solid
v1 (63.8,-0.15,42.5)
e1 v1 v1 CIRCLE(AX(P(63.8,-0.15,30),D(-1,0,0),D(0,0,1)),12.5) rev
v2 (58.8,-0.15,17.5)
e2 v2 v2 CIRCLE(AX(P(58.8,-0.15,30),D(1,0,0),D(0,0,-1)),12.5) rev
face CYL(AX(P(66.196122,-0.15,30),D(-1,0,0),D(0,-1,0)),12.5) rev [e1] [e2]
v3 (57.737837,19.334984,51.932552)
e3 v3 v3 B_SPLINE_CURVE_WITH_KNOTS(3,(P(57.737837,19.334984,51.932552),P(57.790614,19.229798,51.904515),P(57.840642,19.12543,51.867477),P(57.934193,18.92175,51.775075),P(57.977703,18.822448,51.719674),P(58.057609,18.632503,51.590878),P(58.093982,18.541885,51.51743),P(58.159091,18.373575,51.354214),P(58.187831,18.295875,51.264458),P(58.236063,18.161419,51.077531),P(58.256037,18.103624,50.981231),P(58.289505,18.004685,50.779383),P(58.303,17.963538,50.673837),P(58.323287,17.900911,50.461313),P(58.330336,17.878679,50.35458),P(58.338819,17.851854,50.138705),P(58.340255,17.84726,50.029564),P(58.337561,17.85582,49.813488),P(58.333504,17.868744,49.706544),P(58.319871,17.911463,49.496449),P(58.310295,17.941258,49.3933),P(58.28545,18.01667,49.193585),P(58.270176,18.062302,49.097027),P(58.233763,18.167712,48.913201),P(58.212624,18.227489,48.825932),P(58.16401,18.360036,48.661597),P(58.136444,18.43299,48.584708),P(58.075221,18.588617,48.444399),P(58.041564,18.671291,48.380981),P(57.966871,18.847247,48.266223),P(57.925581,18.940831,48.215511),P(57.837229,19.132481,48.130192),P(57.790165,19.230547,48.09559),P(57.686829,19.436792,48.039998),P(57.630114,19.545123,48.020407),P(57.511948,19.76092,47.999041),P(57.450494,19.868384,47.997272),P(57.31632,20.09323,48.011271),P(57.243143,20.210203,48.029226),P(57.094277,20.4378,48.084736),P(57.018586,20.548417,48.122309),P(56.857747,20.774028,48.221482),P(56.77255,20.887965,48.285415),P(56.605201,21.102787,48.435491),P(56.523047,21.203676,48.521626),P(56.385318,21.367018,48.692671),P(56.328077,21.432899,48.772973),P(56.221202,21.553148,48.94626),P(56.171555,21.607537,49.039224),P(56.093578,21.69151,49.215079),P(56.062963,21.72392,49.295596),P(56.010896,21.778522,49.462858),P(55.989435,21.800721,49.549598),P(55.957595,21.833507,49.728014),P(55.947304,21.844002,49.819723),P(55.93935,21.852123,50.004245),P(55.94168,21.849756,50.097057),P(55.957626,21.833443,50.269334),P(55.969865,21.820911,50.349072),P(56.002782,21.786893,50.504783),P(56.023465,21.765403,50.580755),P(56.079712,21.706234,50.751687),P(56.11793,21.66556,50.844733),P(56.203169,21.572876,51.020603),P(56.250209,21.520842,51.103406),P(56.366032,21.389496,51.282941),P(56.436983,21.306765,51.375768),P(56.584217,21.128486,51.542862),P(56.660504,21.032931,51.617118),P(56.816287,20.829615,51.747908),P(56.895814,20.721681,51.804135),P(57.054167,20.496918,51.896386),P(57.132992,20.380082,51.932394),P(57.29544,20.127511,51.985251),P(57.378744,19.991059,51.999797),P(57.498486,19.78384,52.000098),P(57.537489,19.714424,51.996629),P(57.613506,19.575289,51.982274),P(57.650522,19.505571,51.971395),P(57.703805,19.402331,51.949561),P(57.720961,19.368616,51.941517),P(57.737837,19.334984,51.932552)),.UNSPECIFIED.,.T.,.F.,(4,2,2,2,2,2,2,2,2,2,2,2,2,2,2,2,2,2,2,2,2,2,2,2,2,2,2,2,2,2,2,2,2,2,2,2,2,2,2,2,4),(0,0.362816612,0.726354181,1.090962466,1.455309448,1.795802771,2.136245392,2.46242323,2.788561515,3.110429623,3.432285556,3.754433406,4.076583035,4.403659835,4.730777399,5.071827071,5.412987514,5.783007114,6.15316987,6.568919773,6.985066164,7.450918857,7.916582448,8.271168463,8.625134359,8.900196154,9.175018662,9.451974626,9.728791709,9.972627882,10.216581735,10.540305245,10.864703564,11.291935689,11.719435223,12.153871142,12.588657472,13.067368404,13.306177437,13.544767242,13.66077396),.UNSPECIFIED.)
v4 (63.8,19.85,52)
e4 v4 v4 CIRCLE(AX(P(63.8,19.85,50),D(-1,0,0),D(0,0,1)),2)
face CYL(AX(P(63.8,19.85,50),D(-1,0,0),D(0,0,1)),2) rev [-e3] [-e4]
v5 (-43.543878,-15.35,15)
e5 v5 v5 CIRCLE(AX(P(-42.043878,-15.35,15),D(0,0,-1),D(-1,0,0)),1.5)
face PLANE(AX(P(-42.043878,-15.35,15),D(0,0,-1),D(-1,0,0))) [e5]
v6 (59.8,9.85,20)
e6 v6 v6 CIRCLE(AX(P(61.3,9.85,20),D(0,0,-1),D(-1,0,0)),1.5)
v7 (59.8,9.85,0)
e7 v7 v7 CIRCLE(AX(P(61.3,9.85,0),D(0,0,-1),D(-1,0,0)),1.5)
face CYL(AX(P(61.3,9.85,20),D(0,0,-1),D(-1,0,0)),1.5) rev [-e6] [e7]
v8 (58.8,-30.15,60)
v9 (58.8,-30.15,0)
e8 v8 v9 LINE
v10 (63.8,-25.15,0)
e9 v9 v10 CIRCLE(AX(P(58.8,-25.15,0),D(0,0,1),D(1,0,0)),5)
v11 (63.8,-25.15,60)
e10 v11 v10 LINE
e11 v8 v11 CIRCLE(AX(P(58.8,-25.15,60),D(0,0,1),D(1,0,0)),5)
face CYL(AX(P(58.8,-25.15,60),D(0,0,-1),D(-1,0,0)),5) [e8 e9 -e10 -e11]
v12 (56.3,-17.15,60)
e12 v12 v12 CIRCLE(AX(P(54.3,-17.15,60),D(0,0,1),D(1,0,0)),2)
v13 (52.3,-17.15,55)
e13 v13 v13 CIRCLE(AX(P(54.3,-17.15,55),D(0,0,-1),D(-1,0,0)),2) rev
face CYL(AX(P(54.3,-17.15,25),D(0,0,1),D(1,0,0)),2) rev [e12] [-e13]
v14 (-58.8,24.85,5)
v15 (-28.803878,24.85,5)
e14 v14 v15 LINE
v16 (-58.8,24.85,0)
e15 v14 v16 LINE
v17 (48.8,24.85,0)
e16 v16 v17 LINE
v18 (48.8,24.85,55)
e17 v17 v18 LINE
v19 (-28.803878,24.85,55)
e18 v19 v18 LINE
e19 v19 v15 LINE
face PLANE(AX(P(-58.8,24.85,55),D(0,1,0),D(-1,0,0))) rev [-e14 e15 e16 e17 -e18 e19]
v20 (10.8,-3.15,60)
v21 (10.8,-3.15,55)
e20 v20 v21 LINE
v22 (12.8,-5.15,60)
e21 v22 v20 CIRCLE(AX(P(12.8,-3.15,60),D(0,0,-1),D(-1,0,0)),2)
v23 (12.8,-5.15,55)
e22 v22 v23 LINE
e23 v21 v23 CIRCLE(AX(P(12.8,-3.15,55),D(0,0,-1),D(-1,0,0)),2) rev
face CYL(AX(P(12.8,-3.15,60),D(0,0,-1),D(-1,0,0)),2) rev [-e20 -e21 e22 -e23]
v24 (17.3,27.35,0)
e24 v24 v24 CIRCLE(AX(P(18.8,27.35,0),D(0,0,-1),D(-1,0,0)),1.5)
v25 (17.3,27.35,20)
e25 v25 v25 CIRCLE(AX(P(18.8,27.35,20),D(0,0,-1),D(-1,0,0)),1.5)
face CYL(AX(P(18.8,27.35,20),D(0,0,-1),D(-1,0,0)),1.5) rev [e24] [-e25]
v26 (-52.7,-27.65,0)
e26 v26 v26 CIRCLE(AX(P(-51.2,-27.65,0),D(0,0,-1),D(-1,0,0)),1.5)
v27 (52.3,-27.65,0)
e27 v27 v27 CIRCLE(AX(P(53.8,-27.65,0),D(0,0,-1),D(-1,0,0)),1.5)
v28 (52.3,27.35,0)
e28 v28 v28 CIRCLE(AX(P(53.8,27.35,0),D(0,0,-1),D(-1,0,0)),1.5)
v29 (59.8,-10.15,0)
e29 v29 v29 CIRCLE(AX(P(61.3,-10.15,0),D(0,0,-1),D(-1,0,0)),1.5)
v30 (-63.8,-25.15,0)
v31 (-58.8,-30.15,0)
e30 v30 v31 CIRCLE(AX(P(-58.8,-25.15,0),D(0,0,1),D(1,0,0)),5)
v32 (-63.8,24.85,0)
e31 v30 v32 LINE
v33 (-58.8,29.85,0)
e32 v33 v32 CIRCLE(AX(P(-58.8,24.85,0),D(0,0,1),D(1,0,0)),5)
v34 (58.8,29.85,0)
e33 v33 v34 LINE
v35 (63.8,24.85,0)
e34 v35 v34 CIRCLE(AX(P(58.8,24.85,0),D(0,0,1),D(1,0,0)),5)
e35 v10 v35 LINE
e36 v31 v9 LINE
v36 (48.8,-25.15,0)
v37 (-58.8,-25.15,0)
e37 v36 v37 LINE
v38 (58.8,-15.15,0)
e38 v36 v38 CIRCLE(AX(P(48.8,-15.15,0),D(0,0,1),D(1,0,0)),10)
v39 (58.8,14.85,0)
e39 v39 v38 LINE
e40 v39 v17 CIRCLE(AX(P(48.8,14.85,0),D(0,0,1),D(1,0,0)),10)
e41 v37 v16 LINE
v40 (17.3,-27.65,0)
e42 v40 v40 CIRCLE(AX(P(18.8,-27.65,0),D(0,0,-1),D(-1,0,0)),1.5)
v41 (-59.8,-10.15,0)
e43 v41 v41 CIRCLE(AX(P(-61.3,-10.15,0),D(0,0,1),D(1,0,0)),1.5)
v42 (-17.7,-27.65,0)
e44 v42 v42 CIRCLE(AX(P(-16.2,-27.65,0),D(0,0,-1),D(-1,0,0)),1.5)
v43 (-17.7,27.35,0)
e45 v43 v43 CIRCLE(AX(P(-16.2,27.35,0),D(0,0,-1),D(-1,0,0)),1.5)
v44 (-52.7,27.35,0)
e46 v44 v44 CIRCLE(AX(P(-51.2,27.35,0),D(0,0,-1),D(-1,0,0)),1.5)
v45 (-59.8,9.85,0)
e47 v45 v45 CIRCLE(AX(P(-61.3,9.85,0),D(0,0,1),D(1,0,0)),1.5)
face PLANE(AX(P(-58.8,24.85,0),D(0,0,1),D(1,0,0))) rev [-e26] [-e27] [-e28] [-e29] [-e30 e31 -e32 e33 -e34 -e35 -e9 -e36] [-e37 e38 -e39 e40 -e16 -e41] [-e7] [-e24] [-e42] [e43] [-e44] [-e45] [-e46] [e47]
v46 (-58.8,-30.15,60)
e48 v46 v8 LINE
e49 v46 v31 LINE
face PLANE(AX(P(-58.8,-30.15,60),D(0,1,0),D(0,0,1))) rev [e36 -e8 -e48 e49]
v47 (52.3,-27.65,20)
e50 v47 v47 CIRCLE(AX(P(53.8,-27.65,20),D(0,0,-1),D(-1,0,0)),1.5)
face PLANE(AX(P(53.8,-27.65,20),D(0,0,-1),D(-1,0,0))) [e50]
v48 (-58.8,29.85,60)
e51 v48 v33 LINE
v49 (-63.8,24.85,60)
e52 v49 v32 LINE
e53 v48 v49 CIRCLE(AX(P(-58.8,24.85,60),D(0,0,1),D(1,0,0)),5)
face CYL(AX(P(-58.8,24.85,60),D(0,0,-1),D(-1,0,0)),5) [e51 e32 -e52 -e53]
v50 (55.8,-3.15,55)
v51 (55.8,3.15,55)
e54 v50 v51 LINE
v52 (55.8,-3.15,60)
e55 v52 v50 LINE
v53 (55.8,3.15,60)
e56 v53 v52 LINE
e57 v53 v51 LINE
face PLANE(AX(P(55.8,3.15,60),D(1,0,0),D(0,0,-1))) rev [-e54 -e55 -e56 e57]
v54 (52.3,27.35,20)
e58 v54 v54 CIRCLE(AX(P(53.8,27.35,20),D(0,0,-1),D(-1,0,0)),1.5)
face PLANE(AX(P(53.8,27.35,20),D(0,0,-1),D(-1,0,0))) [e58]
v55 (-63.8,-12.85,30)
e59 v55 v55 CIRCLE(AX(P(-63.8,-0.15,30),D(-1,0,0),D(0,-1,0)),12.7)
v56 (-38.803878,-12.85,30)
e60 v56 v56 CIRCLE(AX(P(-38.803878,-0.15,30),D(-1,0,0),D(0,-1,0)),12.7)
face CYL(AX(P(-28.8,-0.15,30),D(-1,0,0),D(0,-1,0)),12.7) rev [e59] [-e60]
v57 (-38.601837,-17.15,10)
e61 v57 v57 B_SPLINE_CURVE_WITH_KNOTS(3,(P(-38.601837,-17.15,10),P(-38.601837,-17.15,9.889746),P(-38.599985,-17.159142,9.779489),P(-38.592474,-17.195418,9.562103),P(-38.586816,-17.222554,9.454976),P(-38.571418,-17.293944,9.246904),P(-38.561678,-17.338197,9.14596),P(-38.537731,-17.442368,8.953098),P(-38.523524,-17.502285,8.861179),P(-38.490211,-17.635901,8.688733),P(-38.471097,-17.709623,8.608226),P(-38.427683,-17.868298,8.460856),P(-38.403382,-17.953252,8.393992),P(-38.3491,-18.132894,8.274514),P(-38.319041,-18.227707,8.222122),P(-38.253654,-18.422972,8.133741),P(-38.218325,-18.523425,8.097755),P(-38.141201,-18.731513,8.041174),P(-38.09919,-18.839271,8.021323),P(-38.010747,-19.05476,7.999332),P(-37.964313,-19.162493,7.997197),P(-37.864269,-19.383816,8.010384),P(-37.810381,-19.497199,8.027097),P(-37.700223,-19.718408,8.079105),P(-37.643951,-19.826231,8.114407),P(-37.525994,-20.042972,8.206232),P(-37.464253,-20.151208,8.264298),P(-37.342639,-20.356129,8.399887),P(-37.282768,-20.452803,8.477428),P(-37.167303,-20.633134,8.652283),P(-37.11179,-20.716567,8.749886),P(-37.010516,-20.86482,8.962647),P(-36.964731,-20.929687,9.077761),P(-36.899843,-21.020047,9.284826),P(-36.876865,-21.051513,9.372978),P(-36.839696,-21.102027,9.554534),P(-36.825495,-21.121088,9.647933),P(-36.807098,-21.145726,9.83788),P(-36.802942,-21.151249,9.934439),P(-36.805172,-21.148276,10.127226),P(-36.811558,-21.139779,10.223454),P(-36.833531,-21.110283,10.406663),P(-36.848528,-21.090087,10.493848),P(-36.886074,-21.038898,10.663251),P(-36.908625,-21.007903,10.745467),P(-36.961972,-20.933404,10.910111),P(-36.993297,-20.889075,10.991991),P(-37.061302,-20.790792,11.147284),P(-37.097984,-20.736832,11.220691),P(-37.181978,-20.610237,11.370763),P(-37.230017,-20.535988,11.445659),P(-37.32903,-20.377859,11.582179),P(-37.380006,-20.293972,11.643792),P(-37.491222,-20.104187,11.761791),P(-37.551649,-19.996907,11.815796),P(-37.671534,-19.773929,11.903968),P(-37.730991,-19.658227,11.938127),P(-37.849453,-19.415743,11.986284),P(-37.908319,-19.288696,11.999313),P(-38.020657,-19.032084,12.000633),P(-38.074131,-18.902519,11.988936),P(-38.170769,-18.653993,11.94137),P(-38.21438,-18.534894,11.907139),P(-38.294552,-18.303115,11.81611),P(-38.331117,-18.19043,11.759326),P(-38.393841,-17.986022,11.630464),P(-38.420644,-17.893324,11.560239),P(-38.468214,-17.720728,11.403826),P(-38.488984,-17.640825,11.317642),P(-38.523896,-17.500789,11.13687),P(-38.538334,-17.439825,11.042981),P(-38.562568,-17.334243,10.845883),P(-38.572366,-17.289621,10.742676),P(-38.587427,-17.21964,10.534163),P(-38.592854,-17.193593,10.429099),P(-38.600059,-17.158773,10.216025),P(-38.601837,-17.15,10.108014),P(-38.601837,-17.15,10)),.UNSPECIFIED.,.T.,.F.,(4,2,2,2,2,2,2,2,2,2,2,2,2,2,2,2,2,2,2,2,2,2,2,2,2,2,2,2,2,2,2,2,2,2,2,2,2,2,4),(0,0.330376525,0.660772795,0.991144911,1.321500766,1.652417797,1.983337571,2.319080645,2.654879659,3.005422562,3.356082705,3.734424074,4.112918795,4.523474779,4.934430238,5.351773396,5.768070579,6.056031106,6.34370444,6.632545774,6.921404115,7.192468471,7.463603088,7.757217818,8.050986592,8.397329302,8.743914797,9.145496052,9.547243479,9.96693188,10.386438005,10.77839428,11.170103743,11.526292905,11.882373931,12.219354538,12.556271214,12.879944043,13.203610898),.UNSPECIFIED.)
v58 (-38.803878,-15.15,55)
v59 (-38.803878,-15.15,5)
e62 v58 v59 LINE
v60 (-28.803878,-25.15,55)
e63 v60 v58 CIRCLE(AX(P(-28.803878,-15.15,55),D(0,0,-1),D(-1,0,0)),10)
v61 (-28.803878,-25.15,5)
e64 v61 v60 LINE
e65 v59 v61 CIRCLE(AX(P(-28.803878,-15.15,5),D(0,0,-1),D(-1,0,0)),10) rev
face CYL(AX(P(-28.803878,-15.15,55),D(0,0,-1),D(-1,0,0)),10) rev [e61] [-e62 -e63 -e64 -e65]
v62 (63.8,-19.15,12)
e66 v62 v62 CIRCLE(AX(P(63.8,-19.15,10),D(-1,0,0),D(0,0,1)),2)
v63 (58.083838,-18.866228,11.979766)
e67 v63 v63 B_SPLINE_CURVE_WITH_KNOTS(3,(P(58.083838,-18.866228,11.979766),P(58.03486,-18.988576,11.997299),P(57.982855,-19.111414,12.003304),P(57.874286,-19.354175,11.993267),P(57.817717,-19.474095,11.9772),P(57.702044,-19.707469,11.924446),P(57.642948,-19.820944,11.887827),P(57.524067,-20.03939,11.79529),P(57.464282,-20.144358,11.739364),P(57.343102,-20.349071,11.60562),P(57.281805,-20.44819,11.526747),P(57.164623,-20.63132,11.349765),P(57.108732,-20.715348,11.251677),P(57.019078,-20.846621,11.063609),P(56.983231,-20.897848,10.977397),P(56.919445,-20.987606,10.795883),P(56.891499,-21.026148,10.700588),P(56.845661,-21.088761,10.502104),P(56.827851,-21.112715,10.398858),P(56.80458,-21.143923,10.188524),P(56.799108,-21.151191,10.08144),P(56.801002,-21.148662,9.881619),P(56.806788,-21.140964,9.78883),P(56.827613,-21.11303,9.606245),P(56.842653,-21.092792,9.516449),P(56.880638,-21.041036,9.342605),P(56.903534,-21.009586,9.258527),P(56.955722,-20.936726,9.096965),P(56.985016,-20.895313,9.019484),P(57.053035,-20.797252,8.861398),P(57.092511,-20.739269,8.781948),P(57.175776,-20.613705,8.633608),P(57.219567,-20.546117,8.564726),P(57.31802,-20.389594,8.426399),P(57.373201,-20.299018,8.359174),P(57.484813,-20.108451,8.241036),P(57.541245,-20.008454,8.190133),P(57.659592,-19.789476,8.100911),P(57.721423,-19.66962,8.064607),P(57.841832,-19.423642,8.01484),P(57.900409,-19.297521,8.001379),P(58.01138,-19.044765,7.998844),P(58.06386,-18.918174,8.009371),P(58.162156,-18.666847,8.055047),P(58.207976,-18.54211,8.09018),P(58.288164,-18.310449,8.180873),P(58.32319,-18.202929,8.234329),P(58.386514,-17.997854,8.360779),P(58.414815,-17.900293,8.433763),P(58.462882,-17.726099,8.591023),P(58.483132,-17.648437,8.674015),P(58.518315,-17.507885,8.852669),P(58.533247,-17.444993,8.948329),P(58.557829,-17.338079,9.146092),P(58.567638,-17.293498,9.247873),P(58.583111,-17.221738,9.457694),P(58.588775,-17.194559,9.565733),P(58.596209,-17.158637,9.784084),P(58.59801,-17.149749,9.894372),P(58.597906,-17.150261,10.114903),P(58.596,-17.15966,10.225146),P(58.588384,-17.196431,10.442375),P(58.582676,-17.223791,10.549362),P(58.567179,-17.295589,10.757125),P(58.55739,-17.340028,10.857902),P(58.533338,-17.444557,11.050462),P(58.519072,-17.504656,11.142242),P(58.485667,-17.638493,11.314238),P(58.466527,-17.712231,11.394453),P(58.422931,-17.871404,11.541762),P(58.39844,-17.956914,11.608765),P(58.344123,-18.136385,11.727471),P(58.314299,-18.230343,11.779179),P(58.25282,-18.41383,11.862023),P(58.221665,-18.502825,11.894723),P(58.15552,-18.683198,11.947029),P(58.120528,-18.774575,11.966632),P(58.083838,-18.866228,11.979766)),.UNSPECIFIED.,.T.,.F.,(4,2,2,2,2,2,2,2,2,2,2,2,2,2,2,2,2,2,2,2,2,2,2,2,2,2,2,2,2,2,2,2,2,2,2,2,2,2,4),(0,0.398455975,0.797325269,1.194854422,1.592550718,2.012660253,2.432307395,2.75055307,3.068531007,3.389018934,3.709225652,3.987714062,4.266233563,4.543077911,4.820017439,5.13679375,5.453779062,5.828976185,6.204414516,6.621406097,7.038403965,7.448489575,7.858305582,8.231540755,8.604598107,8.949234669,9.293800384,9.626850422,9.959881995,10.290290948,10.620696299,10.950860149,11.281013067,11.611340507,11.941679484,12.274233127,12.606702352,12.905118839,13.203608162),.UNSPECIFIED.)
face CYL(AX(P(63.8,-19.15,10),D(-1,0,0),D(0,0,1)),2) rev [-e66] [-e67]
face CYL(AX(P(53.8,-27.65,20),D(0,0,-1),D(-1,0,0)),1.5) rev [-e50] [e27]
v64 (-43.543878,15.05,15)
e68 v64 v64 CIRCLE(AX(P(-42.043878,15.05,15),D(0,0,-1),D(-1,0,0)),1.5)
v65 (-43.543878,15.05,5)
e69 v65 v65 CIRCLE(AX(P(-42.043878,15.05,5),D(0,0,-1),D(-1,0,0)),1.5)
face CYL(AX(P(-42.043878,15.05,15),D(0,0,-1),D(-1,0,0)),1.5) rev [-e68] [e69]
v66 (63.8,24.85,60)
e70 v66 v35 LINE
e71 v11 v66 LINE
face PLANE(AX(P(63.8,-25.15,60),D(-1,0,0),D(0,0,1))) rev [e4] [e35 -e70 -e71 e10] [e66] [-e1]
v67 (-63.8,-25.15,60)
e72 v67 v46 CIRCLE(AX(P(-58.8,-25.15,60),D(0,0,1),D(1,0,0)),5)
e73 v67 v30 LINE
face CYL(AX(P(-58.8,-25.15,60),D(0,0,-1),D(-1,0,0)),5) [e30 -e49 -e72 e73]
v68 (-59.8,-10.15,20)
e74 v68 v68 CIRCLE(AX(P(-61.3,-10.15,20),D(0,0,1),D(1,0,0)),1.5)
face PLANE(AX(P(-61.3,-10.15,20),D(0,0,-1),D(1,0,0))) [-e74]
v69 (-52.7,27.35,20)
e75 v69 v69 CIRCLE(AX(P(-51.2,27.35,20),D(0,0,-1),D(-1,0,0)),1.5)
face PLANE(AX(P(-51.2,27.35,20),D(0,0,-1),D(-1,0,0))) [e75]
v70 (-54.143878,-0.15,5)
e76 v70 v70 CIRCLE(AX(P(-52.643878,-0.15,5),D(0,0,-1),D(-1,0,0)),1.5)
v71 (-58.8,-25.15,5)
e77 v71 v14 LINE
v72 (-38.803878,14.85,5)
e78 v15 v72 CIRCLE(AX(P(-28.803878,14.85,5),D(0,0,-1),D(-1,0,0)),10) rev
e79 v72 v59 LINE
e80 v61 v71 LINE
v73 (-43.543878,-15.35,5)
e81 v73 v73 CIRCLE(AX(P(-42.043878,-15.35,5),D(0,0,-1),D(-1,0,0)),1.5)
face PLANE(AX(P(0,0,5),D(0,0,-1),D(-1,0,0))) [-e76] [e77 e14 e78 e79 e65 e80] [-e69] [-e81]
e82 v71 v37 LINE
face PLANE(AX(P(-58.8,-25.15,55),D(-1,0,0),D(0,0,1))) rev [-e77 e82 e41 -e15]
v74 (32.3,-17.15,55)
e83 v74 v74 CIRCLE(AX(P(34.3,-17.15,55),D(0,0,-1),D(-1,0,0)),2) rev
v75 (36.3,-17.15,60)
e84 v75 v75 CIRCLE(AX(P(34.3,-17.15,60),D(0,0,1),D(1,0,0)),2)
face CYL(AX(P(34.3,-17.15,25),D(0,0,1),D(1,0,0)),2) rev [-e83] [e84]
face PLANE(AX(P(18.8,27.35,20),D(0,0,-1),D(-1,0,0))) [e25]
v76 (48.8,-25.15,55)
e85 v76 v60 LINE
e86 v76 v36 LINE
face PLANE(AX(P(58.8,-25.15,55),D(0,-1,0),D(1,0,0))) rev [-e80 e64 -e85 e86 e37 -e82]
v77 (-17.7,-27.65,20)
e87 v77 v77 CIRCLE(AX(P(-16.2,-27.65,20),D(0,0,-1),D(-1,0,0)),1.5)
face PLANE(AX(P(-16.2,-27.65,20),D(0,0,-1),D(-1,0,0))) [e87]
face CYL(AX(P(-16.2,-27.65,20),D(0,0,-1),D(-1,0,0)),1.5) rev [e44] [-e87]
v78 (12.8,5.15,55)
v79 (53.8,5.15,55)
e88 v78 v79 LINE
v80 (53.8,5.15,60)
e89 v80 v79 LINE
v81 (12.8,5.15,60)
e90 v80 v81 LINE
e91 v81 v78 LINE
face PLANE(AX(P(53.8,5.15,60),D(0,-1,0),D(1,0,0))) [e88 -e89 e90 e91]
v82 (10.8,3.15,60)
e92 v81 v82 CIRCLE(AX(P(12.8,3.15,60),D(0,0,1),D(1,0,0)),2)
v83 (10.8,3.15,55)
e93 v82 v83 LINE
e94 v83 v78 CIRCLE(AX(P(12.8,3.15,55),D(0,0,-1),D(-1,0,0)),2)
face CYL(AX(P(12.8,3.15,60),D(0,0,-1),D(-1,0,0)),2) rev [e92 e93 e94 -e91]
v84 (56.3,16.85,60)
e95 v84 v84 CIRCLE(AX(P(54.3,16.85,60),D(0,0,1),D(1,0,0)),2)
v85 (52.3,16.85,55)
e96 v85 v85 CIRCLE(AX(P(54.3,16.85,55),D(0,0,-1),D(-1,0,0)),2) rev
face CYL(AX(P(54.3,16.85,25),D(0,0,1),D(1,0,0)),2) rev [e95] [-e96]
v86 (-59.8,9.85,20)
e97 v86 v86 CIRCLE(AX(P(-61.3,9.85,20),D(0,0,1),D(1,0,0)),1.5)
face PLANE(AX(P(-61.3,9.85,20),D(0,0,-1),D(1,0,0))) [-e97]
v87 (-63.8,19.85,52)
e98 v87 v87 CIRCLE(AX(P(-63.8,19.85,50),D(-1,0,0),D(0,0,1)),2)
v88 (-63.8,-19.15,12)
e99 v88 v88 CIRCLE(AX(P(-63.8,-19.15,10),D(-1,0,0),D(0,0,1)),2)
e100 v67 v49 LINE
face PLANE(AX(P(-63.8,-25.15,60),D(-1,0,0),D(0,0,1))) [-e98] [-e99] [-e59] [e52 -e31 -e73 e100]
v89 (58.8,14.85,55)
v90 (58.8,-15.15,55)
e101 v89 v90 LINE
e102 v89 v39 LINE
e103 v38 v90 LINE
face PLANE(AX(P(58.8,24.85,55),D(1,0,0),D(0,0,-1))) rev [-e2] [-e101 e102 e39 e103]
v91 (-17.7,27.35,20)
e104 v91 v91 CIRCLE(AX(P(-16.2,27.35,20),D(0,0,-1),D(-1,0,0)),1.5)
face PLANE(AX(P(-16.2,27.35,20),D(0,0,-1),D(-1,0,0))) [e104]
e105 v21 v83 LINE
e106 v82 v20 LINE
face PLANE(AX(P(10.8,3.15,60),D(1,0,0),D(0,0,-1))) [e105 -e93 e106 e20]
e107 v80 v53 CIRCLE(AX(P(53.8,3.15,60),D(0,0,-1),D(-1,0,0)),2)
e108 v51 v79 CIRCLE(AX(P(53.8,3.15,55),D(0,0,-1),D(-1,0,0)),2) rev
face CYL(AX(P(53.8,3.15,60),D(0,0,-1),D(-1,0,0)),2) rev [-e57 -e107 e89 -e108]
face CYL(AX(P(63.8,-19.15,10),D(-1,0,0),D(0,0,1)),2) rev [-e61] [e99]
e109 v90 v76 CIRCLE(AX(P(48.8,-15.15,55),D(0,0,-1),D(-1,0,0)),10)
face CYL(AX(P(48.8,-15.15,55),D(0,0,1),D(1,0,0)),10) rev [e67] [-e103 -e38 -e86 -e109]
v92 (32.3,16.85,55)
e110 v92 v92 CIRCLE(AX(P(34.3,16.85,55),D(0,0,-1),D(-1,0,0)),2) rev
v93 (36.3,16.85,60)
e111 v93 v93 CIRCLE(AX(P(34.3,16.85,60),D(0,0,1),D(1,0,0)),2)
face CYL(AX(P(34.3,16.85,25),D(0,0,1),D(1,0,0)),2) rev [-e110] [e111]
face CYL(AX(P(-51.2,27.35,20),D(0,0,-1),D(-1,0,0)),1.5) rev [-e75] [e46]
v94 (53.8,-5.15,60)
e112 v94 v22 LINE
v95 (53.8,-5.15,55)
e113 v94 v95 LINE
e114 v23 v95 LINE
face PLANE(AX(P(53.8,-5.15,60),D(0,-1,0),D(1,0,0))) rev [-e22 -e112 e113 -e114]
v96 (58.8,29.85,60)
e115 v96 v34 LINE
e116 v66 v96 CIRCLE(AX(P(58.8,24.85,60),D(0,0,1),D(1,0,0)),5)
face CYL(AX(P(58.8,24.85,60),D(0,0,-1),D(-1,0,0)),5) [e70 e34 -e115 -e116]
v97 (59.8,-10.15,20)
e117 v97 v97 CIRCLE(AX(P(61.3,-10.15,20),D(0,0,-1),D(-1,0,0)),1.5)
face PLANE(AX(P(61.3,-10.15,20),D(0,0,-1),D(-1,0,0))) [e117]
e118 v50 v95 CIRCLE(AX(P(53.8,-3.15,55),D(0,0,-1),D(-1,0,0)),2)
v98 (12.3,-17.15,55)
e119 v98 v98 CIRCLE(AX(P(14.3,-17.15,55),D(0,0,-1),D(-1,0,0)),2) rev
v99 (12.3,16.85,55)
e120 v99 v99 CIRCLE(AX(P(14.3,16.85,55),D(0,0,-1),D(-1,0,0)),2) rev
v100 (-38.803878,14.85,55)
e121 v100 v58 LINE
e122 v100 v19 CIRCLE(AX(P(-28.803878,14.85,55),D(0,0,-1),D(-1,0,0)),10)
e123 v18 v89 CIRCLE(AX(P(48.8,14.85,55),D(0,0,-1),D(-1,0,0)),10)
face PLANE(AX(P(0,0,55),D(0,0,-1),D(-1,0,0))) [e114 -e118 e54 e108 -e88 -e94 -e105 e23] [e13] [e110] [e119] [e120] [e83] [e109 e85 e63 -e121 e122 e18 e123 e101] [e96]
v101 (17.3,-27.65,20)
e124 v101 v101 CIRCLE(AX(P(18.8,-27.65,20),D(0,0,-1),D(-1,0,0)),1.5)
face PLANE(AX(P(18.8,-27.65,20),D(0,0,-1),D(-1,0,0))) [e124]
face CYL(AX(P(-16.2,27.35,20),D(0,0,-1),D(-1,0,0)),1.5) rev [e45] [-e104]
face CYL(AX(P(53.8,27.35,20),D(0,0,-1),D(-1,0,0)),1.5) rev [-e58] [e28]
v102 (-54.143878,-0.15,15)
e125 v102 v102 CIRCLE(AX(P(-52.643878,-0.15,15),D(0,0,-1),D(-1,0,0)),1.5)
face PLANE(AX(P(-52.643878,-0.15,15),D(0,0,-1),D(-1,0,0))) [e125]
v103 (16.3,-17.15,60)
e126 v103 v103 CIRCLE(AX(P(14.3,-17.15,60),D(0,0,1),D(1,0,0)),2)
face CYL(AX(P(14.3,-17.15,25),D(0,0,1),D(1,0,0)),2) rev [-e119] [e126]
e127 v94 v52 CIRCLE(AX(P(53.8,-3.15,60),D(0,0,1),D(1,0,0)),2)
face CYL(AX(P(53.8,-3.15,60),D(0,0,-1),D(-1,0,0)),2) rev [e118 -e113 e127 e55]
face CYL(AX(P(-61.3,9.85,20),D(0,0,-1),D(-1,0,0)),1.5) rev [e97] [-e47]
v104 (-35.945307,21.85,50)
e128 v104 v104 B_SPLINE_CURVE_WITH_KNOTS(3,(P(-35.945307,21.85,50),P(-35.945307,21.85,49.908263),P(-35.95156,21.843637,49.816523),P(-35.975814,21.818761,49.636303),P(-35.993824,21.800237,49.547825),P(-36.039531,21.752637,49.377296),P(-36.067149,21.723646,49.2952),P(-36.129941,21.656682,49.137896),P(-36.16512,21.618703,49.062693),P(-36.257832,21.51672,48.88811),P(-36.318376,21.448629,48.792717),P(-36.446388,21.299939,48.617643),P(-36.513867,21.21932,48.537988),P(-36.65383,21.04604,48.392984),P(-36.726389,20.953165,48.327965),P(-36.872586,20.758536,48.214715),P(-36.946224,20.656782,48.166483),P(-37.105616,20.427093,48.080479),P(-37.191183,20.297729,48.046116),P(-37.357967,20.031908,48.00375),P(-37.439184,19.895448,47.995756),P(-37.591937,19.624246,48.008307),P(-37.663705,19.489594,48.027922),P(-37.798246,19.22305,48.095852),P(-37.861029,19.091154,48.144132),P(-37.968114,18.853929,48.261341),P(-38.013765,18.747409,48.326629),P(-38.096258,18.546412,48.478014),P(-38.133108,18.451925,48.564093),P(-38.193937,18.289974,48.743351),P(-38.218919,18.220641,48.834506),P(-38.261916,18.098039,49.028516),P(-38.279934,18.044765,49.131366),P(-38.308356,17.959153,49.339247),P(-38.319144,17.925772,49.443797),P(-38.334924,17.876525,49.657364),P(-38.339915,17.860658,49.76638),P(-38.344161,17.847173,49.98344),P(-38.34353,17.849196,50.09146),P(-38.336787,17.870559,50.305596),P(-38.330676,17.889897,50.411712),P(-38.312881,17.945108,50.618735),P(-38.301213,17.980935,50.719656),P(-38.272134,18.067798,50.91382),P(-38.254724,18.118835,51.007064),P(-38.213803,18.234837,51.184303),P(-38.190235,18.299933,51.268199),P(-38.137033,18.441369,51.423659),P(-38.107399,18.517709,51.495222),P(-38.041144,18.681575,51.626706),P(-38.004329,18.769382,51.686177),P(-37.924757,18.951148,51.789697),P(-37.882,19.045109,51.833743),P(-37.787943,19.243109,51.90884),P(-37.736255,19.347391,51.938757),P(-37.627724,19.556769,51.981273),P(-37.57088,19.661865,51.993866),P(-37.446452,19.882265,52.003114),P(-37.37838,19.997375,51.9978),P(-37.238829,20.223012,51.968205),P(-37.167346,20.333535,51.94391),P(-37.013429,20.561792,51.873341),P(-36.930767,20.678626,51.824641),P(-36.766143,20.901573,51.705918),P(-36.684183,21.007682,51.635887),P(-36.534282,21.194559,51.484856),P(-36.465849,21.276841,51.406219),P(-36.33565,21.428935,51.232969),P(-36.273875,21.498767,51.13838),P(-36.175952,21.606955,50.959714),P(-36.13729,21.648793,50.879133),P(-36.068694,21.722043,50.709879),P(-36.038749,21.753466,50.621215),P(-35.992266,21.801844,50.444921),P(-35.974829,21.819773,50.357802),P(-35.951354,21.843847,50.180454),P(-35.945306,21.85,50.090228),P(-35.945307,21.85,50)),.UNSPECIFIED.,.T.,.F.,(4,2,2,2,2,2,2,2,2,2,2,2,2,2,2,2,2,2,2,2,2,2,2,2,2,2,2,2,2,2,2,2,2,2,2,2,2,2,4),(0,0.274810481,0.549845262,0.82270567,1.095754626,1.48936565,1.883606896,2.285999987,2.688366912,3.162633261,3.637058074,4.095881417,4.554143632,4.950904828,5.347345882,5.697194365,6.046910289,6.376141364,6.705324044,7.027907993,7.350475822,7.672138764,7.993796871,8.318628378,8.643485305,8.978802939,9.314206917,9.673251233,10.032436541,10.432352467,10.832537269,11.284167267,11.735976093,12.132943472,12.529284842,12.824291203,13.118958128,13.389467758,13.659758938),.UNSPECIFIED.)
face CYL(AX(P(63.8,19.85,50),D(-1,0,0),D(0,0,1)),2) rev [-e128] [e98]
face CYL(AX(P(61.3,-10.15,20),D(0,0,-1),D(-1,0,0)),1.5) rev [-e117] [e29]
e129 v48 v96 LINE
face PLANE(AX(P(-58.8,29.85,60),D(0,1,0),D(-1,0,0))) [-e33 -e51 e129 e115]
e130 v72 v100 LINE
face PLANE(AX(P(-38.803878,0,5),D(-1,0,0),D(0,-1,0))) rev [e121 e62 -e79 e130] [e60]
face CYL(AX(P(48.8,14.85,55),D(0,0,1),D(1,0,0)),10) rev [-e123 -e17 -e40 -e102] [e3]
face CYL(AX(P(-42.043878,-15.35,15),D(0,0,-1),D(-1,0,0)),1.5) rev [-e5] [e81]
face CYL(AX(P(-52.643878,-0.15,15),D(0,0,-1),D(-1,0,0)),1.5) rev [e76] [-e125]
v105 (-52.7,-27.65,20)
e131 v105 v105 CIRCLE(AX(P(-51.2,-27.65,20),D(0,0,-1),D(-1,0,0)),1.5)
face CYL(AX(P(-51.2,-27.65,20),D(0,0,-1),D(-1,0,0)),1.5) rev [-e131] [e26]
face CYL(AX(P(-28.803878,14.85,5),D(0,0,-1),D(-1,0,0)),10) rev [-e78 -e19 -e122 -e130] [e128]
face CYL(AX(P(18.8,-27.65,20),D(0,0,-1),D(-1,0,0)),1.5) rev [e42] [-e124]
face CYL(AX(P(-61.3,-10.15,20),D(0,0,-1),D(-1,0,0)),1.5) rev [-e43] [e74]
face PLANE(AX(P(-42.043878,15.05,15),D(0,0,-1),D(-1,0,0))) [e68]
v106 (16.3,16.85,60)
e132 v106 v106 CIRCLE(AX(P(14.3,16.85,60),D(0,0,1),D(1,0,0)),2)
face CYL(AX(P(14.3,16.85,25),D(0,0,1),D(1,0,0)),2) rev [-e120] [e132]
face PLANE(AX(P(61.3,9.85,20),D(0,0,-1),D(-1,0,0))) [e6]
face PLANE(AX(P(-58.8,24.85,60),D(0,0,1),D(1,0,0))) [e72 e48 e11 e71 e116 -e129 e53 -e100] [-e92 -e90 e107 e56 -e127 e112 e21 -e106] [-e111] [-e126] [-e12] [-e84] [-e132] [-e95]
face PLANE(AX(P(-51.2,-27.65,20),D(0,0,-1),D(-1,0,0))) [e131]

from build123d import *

# Parameters (mm, degrees)
BOSS_EXTRUDE1_DEPTH  = 60
SKETCH3_R            = 2
CUT_EXTRUDE2_DEPTH   = 35
SKETCH2_W            = 117.6
SKETCH2_H            = 50
CUT_EXTRUDE4_DEPTH   = 55
BOSS_EXTRUDE2_DEPTH  = 50
SKETCH8_R            = 12.7
CUT_EXTRUDE5_DEPTH   = 35
SKETCH13_R           = 2
CUT_EXTRUDE6_DEPTH   = 145.190091546
SKETCH14_R           = 1.5
CUT_EXTRUDE7_DEPTH   = 10
SKETCH16_R           = 12.5
CUT_EXTRUDE8_DEPTH   = 10
SKETCH17_R           = 1.5
CUT_EXTRUDE9_DEPTH   = 20
SKETCH18_R           = 1.5
CUT_EXTRUDE10_DEPTH  = 20
LPATTERN1_COUNT      = 4
LPATTERN1_PITCH      = 35
LPATTERN1_COUNT_DIR2 = 2
LPATTERN1_PITCH_DIR2 = 55
FILLET1_R            = 10


with BuildPart() as part:
    # Sketch1 → Boss-Extrude1 (new body)
    with BuildSketch(Plane.XY):
        with BuildLine():
            Line((-58.8, -30.15), (58.8, -30.15))
            ThreePointArc((58.8, -30.15), (62.335533906, -28.685533906), (63.8, -25.15))
            Line((63.8, -25.15), (63.8, 24.85))
            ThreePointArc((63.8, 24.85), (62.335533906, 28.385533906), (58.8, 29.85))
            Line((58.8, 29.85), (-58.8, 29.85))
            ThreePointArc((-58.8, 29.85), (-62.335533906, 28.385533906), (-63.8, 24.85))
            Line((-63.8, 24.85), (-63.8, -25.15))
            ThreePointArc((-63.8, -25.15), (-62.335533906, -28.685533906), (-58.8, -30.15))
        make_face()
        with BuildLine():
            Line((53.8, 5.15), (12.8, 5.15))
            ThreePointArc((12.8, 5.15), (11.385786438, 4.564213562), (10.8, 3.15))
            Line((10.8, 3.15), (10.8, -3.15))
            ThreePointArc((10.8, -3.15), (11.385786438, -4.564213562), (12.8, -5.15))
            Line((12.8, -5.15), (53.8, -5.15))
            ThreePointArc((53.8, -5.15), (55.214213562, -4.564213562), (55.8, -3.15))
            Line((55.8, -3.15), (55.8, 3.15))
            ThreePointArc((55.8, 3.15), (55.214213562, 4.564213562), (53.8, 5.15))
        make_face(mode=Mode.SUBTRACT)
    extrude(amount=BOSS_EXTRUDE1_DEPTH)

    # Sketch3 → Cut-Extrude2 (cut)
    with BuildSketch(Plane.XY.offset(60)):
        with Locations((14.3, 16.85)):
            Circle(SKETCH3_R)
        with Locations((34.3, 16.85)):
            Circle(SKETCH3_R)
        with Locations((54.3, 16.85)):
            Circle(SKETCH3_R)
        with Locations((34.3, -17.15)):
            Circle(SKETCH3_R)
        with Locations((54.3, -17.15)):
            Circle(SKETCH3_R)
        with Locations((14.3, -17.15)):
            Circle(SKETCH3_R)
    extrude(amount=-CUT_EXTRUDE2_DEPTH, mode=Mode.SUBTRACT)

    # Sketch2 → Cut-Extrude4 (cut)
    with BuildSketch(Plane(origin=(0, 0, 0), x_dir=(-1, 0, 0), z_dir=(0, 0, -1))):
        with Locations((0, -0.15)):
            Rectangle(SKETCH2_W, SKETCH2_H)
    extrude(amount=-CUT_EXTRUDE4_DEPTH, mode=Mode.SUBTRACT)

    # Sketch12 → Boss-Extrude2 (add)
    with BuildSketch(Plane(origin=(0, 0, 55), x_dir=(-1, 0, 0), z_dir=(0, 0, -1))):
        Polygon((53.8, 24.85), (38.80387838, 24.85), (38.80387838, -25.15), (58.8, -25.15), (58.8, 19.85), (58.8, 24.85), align=None)
    extrude(amount=BOSS_EXTRUDE2_DEPTH)

    # Sketch8 → Cut-Extrude5 (cut)
    with BuildSketch(Plane.ZY.offset(63.8)):
        with Locations(Location((30, -0.15, 0), (0, 0, 270))):
            Circle(SKETCH8_R)
    extrude(amount=-CUT_EXTRUDE5_DEPTH, mode=Mode.SUBTRACT)

    # Sketch13 → Cut-Extrude6 (cut, through all)
    with BuildSketch(Plane.ZY.offset(63.8)):
        with Locations((10, -19.15)):
            Circle(SKETCH13_R)
        with Locations((50, 19.85)):
            Circle(SKETCH13_R)
    extrude(amount=-CUT_EXTRUDE6_DEPTH, mode=Mode.SUBTRACT)

    # Sketch14 → Cut-Extrude7 (cut)
    with BuildSketch(Plane(origin=(0, 0, 5), x_dir=(-1, 0, 0), z_dir=(0, 0, -1))):
        with Locations((52.64387838, -0.15)):
            Circle(SKETCH14_R)
        with Locations((42.04387838, 15.05)):
            Circle(SKETCH14_R)
        with Locations((42.04387838, -15.35)):
            Circle(SKETCH14_R)
    extrude(amount=-CUT_EXTRUDE7_DEPTH, mode=Mode.SUBTRACT)

    # Sketch16 → Cut-Extrude8 (cut)
    with BuildSketch(Plane(origin=(56.19612162, 0, 0), x_dir=(0, 0, -1), z_dir=(1, 0, 0))):
        with Locations((-30, -0.15)):
            Circle(SKETCH16_R)
    extrude(amount=CUT_EXTRUDE8_DEPTH, mode=Mode.SUBTRACT)

    # Sketch17 → Cut-Extrude9 (cut)
    with BuildSketch(Plane(origin=(0, 0, 0), x_dir=(-1, 0, 0), z_dir=(0, 0, -1))):
        with Locations((-53.8, 27.35)):
            Circle(SKETCH17_R)
    cut_extrude9 = extrude(amount=-CUT_EXTRUDE9_DEPTH, mode=Mode.SUBTRACT)

    # Sketch18 → Cut-Extrude10 (cut)
    with BuildSketch(Plane(origin=(0, 0, 0), x_dir=(-1, 0, 0), z_dir=(0, 0, -1))):
        with Locations((-61.3, 9.85)):
            Circle(SKETCH18_R)
        with Locations((-61.3, -10.15)):
            Circle(SKETCH18_R)
    cut_extrude10 = extrude(amount=-CUT_EXTRUDE10_DEPTH, mode=Mode.SUBTRACT)

    # LPattern1: Cut-Extrude9 4 × 2
    with Locations(*[(-i * LPATTERN1_PITCH, -j * LPATTERN1_PITCH_DIR2, 0) for i in range(LPATTERN1_COUNT) for j in range(LPATTERN1_COUNT_DIR2) if (i, j) != (0, 0)]):
        add(cut_extrude9, mode=Mode.SUBTRACT)

    # Mirror1: Cut-Extrude10 across plane
    add(cut_extrude10.mirror(Plane(origin=(0, 0, 0), x_dir=(0, 0, 1), z_dir=(1, 0, 0))), mode=Mode.SUBTRACT)

    # Fillet1
    # the kernel refuses this fillet: 10 mm, written as the material it adds along each edge
    with BuildSketch(Plane(origin=(-38.80387838, 24.85, 55), x_dir=(1, 0, 0), z_dir=(0, 0, -1))) as fillet1_piece_1_section:
        with BuildLine():
            CenterArc((FILLET1_R, FILLET1_R), FILLET1_R, 180, 90)
            Line((0, FILLET1_R), (0, 0))
            Line((0, 0), (FILLET1_R, 0))
        make_face()
    fillet1_piece_1 = extrude(amount=50, mode=Mode.PRIVATE)
    fillet1_piece_1 = fillet1_piece_1 - Plane(origin=(-36.514873335, 19.85, 50), x_dir=(0, 0, 1), z_dir=(-1, 0, 0)) * Cylinder(2, 140, mode=Mode.PRIVATE)
    add(fillet1_piece_1)
    with BuildSketch(Plane(origin=(-38.80387838, -25.15, 55), x_dir=(1, 0, 0), z_dir=(0, 0, -1))) as fillet1_piece_2_section:
        with BuildLine():
            CenterArc((FILLET1_R, -FILLET1_R), FILLET1_R, 90, 90)
            Line((0, -FILLET1_R), (0, 0))
            Line((0, 0), (FILLET1_R, 0))
        make_face()
    fillet1_piece_2 = extrude(amount=50, mode=Mode.PRIVATE)
    fillet1_piece_2 = fillet1_piece_2 - Plane(origin=(-36.519941054, -19.15, 10), x_dir=(0, 0, 1), z_dir=(-1, 0, 0)) * Cylinder(2, 140, mode=Mode.PRIVATE)
    add(fillet1_piece_2)
    with BuildSketch(Plane(origin=(58.8, 24.85, 0), x_dir=(-1, 0, 0), z_dir=(0, 0, 1))) as fillet1_piece_3_section:
        with BuildLine():
            CenterArc((FILLET1_R, FILLET1_R), FILLET1_R, 180, 90)
            Line((0, FILLET1_R), (0, 0))
            Line((0, 0), (FILLET1_R, 0))
        make_face()
    fillet1_piece_3 = extrude(amount=55, mode=Mode.PRIVATE)
    fillet1_piece_3 = fillet1_piece_3 - Plane(origin=(56.513305824, 19.85, 50), x_dir=(0, 0, 1), z_dir=(-1, 0, 0)) * Cylinder(2, 150, mode=Mode.PRIVATE)
    add(fillet1_piece_3)
    with BuildSketch(Plane(origin=(58.8, -25.15, 0), x_dir=(0, 1, 0), z_dir=(0, 0, 1))) as fillet1_piece_4_section:
        with BuildLine():
            CenterArc((FILLET1_R, FILLET1_R), FILLET1_R, 180, 90)
            Line((0, FILLET1_R), (0, 0))
            Line((0, 0), (FILLET1_R, 0))
        make_face()
    fillet1_piece_4 = extrude(amount=55, mode=Mode.PRIVATE)
    fillet1_piece_4 = fillet1_piece_4 - Plane(origin=(56.517896766, -19.15, 10), x_dir=(0, 0, 1), z_dir=(-1, 0, 0)) * Cylinder(2, 150, mode=Mode.PRIVATE)
    add(fillet1_piece_4)


solid = part.part
